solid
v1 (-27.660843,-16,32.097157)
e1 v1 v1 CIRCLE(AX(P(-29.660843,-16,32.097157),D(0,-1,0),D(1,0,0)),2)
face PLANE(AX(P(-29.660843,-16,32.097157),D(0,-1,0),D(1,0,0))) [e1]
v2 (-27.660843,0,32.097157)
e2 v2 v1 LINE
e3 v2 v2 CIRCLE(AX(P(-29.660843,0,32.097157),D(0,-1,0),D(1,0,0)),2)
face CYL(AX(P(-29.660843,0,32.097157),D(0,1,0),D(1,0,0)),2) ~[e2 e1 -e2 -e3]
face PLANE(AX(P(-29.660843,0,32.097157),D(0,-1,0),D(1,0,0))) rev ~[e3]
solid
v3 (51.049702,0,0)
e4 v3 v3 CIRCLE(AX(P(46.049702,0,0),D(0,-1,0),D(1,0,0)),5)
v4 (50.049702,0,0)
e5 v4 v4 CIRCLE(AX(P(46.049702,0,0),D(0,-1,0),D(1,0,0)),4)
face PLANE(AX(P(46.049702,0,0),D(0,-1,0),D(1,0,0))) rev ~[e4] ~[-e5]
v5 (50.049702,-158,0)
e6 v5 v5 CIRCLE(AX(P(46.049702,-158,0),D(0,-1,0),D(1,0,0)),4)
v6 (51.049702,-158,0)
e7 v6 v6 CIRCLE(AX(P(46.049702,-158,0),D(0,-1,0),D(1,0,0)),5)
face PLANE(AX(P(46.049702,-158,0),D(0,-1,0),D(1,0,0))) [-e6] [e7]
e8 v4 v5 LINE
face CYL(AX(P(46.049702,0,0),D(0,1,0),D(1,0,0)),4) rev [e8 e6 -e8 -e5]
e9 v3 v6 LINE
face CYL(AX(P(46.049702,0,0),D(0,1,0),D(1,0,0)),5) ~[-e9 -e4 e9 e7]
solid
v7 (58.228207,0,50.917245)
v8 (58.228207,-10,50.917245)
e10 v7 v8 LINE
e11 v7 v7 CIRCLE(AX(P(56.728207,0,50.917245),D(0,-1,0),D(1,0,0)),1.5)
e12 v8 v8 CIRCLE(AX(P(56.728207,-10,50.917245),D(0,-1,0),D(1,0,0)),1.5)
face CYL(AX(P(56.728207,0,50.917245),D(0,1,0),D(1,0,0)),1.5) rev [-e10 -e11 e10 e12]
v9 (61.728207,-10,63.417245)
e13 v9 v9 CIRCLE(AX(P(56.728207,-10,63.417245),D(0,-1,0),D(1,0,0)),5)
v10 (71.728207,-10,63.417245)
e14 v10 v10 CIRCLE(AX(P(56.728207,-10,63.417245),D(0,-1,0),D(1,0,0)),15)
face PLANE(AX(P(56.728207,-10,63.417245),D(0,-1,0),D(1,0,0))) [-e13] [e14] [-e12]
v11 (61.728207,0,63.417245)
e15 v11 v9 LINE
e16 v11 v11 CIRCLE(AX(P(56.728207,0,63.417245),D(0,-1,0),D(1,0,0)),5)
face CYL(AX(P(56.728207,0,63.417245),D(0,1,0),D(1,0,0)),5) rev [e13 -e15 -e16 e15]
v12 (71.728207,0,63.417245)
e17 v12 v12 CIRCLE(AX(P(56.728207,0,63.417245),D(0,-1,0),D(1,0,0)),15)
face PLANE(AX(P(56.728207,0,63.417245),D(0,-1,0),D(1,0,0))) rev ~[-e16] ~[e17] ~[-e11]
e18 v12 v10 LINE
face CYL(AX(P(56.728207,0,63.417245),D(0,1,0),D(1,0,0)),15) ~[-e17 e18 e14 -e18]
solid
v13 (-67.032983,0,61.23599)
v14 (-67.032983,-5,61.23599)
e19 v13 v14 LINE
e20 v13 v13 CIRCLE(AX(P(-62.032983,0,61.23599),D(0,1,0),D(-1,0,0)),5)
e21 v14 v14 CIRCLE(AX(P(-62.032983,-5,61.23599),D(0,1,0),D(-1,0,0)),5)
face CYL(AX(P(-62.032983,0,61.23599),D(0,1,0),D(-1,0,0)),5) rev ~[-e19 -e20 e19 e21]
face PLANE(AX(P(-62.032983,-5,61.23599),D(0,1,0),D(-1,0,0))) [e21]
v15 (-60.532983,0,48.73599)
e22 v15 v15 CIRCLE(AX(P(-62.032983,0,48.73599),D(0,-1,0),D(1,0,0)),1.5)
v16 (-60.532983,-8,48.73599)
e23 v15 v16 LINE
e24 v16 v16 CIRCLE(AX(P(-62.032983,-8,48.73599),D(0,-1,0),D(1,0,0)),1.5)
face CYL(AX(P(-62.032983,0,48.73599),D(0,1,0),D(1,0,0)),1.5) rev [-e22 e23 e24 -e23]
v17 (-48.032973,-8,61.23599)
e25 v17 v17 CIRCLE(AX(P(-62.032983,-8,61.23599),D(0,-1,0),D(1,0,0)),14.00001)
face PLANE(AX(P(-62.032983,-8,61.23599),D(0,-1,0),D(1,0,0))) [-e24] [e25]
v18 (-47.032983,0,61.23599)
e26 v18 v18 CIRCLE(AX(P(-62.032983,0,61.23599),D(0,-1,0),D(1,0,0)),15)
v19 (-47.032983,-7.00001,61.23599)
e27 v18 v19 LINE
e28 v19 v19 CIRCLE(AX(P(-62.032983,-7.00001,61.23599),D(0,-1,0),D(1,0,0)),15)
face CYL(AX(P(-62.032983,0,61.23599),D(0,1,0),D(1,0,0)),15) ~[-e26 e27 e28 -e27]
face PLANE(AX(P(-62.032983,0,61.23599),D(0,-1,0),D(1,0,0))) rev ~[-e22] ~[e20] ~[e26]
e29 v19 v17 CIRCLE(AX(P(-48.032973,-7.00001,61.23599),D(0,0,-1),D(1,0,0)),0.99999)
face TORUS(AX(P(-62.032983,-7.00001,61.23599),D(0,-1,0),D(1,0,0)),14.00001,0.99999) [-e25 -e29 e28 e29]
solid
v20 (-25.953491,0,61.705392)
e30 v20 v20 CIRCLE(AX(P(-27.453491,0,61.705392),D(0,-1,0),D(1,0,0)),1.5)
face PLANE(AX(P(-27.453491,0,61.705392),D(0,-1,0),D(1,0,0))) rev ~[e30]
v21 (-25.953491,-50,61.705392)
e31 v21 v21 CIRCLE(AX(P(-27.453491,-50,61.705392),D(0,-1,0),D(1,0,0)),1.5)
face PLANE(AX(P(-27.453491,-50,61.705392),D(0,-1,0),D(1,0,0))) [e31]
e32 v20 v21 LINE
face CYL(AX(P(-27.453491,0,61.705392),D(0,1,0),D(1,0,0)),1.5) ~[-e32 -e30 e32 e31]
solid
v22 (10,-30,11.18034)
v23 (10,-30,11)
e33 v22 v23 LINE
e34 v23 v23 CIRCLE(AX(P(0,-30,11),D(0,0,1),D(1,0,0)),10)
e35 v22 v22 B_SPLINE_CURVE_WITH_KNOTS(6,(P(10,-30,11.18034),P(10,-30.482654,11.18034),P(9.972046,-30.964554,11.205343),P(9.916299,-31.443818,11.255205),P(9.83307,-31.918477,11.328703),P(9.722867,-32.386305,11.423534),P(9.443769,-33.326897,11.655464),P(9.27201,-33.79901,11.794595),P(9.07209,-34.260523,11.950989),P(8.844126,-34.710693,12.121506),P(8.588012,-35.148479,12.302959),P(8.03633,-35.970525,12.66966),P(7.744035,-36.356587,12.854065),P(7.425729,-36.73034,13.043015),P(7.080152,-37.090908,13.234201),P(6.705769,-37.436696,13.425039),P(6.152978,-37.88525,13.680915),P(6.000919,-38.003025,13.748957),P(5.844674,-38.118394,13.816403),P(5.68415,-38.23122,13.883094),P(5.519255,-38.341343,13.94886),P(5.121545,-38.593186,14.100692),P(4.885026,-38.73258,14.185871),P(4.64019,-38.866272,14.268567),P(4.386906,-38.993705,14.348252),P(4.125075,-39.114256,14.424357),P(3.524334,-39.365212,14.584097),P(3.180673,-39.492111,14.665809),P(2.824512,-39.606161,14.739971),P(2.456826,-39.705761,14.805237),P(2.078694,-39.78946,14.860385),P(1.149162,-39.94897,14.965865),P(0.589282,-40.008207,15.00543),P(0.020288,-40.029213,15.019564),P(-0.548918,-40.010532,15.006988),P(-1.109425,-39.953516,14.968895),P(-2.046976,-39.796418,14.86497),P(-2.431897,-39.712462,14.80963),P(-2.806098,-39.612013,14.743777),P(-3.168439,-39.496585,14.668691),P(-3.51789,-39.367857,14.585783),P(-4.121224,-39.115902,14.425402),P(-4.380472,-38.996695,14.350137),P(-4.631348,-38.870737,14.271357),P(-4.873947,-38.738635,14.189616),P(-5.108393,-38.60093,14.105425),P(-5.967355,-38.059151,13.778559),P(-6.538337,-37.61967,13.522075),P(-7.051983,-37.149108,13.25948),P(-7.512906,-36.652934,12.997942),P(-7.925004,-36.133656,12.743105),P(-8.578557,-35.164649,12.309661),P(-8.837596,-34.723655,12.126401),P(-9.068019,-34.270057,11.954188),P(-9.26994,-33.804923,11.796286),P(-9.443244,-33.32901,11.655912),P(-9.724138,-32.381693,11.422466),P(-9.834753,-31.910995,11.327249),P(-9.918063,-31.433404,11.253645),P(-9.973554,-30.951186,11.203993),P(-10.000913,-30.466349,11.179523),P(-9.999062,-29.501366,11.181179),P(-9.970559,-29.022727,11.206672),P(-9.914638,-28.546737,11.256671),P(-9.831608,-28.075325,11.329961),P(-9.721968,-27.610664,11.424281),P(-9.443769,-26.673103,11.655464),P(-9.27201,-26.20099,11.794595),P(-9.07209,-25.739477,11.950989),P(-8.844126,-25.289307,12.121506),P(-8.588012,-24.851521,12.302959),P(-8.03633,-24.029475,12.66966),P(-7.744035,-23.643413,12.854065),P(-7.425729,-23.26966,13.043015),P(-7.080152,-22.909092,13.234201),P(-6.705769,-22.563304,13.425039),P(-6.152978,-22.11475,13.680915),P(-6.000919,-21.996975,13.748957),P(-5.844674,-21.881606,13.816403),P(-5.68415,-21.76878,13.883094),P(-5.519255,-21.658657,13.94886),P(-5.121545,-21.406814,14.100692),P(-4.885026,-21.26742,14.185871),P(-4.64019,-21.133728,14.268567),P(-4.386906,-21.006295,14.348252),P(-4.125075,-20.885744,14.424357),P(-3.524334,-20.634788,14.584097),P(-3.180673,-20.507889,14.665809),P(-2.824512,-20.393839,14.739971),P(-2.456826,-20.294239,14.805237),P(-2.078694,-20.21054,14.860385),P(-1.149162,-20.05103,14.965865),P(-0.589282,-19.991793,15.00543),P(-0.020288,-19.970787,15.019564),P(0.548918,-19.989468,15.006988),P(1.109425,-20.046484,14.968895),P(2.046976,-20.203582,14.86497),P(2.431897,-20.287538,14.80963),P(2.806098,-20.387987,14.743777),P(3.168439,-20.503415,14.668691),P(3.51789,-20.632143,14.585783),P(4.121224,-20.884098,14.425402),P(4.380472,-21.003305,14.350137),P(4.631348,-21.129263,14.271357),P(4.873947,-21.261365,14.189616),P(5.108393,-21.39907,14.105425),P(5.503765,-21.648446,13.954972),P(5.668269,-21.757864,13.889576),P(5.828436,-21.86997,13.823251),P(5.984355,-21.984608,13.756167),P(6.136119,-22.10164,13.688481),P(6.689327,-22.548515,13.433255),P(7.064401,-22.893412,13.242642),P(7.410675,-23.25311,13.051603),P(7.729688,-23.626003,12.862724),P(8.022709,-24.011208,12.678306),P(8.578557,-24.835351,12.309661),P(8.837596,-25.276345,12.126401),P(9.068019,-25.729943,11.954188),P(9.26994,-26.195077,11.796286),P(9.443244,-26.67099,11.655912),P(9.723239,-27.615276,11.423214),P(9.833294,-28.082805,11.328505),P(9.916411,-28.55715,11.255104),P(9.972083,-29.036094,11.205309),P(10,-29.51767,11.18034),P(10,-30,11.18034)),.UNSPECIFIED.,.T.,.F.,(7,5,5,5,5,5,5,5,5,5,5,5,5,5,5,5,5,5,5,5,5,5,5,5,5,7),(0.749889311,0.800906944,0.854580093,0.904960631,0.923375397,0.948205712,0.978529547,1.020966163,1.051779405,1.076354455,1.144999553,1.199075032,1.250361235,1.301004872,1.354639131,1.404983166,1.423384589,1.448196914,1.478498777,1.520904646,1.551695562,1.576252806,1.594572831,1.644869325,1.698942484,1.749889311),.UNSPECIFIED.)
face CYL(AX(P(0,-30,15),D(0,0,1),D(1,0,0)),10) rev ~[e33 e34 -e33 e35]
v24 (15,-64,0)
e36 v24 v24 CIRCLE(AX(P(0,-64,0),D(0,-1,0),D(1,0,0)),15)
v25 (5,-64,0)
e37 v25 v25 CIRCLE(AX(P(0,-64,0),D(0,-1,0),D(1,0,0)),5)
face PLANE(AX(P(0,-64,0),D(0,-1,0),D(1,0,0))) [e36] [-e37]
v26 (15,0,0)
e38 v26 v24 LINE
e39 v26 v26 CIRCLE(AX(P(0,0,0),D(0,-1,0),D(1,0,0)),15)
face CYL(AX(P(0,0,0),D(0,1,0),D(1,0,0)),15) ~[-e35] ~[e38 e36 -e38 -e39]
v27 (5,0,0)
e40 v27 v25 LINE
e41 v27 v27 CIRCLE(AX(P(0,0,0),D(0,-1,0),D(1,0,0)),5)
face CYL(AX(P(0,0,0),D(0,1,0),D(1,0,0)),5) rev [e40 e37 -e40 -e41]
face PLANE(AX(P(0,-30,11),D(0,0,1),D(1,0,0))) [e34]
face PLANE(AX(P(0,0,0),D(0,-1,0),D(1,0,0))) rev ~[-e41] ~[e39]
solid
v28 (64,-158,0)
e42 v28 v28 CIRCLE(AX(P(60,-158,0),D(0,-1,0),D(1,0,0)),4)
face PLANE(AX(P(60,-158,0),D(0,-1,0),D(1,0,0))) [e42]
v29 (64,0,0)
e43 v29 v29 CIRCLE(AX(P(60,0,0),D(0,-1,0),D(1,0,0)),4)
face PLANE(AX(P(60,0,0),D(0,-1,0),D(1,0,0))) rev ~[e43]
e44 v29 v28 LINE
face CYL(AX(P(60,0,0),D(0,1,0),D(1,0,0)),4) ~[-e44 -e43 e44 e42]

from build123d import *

# Parameters (mm, degrees)
F0_R      = 15
F0_R_2    = 5
F1_DEPTH  = 64
F2_R      = 2
F2_R_2    = 5
F3_DEPTH  = 3
F4_R      = 15
F4_R_2    = 2
F4_R_3    = 5
F5_DEPTH  = 10
F6_R      = 15
F6_R_2    = 1.5
F6_R_3    = 5
F7_DEPTH  = 2
F9_R      = 10
F10_DEPTH = 4
F11_R     = 5
F11_R_2   = 4
F12_DEPTH = 158
F13_R     = 4
F14_DEPTH = 158
F15_R     = 2
F16_DEPTH = 16
F17_R     = 15
F17_R_2   = 1.5
F18_DEPTH = 8
F19_R     = 1.5
F20_DEPTH = 50
F21_R     = 0.99999
F17_R_3   = 5
F22_DEPTH = 10
F23_R     = 5
F24_DEPTH = 5


# Not quite as in the source:
# - a fillet or chamfer is up to 0.001 mm smaller than in the source, because OpenCascade refuses the exact size
# - a feature names something its author has since deleted; it is built from what else it names


with BuildPart() as f1:
    # F0 (on Front) → F1 (new body)
    with BuildSketch(Plane.XZ):
        Circle(F0_R)
        Circle(F0_R_2, mode=Mode.SUBTRACT)
    extrude(amount=F1_DEPTH)

    # F9 (on offset) → F10 (cut)
    with BuildSketch(Plane.XY.offset(15)):
        with Locations((0, -30)):
            Circle(F9_R)
    extrude(amount=-F10_DEPTH, mode=Mode.SUBTRACT)


with BuildPart() as f3:
    # F2 (on Front) → F3 (new body)
    with BuildSketch(Plane.XZ):
        with BuildLine():
            Line((-54.3058665821, 6.5412230759), (-51.4285073808, 3.7625895941))
            ThreePointArc((-51.4285073808, 3.7625895941), (-48.3108465674, 8.5633662497), (-47.2186043859, 14.182465151))
            ThreePointArc((-47.2186043859, 14.182465151), (-67.8377032871, 28.0902229695), (-73.0087013909, 3.7625895941))
            Line((-73.0087013909, 3.7625895941), (-70.1313421896, 6.5412230759))
            ThreePointArc((-70.1313421896, 6.5412230759), (-62.2186043859, 3.182465151), (-54.3058665821, 6.5412230759))
        make_face()
        with Locations((-72.2186043859, 14.182465151)):
            Circle(F2_R, mode=Mode.SUBTRACT)
        with Locations((-62.2186043859, 14.182465151)):
            Circle(F2_R_2, mode=Mode.SUBTRACT)
        with BuildLine():
            ThreePointArc((-54.2186043859, 14.182465151), (-52.2186043859, 16.182465151), (-50.2186043859, 14.182465151))
            ThreePointArc((-50.2186043859, 14.182465151), (-52.2186043859, 12.182465151), (-54.2186043859, 14.182465151))
        make_face(mode=Mode.SUBTRACT)
    extrude(amount=F3_DEPTH)


with BuildPart() as f5:
    # F4 (on Front) → F5 (new body)
    with BuildSketch(Plane.XZ):
        with Locations((-47.7725118399, -37.5088863075)):
            Circle(F4_R)
        with Locations((-57.7725118399, -37.5088863075)):
            Circle(F4_R_2, mode=Mode.SUBTRACT)
        with Locations((-47.7725118399, -37.5088863075)):
            Circle(F4_R_3, mode=Mode.SUBTRACT)
        with Locations((-37.7725118399, -37.5088863075)):
            Circle(F4_R_2, mode=Mode.SUBTRACT)
    extrude(amount=F5_DEPTH)


with BuildPart() as f7:
    # F6 (on Front) → F7 (new body)
    with BuildSketch(Plane.XZ):
        with Locations((12.6999374479, 49.0343069208)):
            Circle(F6_R)
        with Locations((12.6999374479, 36.5343069208)):
            Circle(F6_R_2, mode=Mode.SUBTRACT)
        with Locations((12.6999374479, 49.0343069208)):
            Circle(F6_R_3, mode=Mode.SUBTRACT)
    extrude(amount=F7_DEPTH)


with BuildPart() as f12:
    # F11 (on Front) → F12 (new body)
    with BuildSketch(Plane.XZ):
        with Locations((46.0497015125, 0)):
            Circle(F11_R)
        with Locations((46.0497015125, 0)):
            Circle(F11_R_2, mode=Mode.SUBTRACT)
    extrude(amount=F12_DEPTH)


with BuildPart() as f14:
    # F13 (on Front) → F14 (new body)
    with BuildSketch(Plane.XZ):
        with Locations((60, 0)):
            Circle(F13_R)
    extrude(amount=F14_DEPTH)


with BuildPart() as f16:
    # F15 (on Front) → F16 (new body)
    with BuildSketch(Plane.XZ):
        with Locations((-29.6608433127, 32.0971570909)):
            Circle(F15_R)
    extrude(amount=F16_DEPTH)


with BuildPart() as f18:
    # F17 (on Front) → F18 (new body)
    with BuildSketch(Plane.XZ):
        with Locations((-62.032982707, 61.2359903753)):
            Circle(F17_R)
        with Locations((-62.032982707, 48.7359903753)):
            Circle(F17_R_2, mode=Mode.SUBTRACT)
    extrude(amount=F18_DEPTH)

    # F21 (radius 1 in the source; OpenCascade refuses exactly that, so slightly less here)
    f21_edges = [f18.edges().sort_by_distance(p)[0] for p in [
        (-77.032983, -8, 61.23599),
    ]]
    fillet(f21_edges, radius=F21_R)

    # F23 (on face) → F24 (cut)
    with BuildSketch(Plane(origin=(0, 0, 0), x_dir=(-1, 0, 0), z_dir=(0, 1, 0))):
        with Locations((62.032982707, 61.2359903753)):
            Circle(F23_R)
    extrude(amount=-F24_DEPTH, mode=Mode.SUBTRACT)


with BuildPart() as f20:
    # F19 (on Front) → F20 (new body)
    with BuildSketch(Plane.XZ):
        with Locations((-27.4534914643, 61.705391854)):
            Circle(F19_R)
    extrude(amount=F20_DEPTH)


with BuildPart() as f22:
    # F17 (on Front) → F22 (new body)
    with BuildSketch(Plane.XZ):
        with Locations((56.7282065749, 63.4172449509)):
            Circle(F17_R)
        with Locations((56.7282065749, 50.9172449509)):
            Circle(F17_R_2, mode=Mode.SUBTRACT)
        with Locations((56.7282065749, 63.4172449509)):
            Circle(F17_R_3, mode=Mode.SUBTRACT)
    extrude(amount=F22_DEPTH)


solid = Compound([f1.part, f12.part, f14.part, f16.part, f18.part, f20.part, f22.part])
